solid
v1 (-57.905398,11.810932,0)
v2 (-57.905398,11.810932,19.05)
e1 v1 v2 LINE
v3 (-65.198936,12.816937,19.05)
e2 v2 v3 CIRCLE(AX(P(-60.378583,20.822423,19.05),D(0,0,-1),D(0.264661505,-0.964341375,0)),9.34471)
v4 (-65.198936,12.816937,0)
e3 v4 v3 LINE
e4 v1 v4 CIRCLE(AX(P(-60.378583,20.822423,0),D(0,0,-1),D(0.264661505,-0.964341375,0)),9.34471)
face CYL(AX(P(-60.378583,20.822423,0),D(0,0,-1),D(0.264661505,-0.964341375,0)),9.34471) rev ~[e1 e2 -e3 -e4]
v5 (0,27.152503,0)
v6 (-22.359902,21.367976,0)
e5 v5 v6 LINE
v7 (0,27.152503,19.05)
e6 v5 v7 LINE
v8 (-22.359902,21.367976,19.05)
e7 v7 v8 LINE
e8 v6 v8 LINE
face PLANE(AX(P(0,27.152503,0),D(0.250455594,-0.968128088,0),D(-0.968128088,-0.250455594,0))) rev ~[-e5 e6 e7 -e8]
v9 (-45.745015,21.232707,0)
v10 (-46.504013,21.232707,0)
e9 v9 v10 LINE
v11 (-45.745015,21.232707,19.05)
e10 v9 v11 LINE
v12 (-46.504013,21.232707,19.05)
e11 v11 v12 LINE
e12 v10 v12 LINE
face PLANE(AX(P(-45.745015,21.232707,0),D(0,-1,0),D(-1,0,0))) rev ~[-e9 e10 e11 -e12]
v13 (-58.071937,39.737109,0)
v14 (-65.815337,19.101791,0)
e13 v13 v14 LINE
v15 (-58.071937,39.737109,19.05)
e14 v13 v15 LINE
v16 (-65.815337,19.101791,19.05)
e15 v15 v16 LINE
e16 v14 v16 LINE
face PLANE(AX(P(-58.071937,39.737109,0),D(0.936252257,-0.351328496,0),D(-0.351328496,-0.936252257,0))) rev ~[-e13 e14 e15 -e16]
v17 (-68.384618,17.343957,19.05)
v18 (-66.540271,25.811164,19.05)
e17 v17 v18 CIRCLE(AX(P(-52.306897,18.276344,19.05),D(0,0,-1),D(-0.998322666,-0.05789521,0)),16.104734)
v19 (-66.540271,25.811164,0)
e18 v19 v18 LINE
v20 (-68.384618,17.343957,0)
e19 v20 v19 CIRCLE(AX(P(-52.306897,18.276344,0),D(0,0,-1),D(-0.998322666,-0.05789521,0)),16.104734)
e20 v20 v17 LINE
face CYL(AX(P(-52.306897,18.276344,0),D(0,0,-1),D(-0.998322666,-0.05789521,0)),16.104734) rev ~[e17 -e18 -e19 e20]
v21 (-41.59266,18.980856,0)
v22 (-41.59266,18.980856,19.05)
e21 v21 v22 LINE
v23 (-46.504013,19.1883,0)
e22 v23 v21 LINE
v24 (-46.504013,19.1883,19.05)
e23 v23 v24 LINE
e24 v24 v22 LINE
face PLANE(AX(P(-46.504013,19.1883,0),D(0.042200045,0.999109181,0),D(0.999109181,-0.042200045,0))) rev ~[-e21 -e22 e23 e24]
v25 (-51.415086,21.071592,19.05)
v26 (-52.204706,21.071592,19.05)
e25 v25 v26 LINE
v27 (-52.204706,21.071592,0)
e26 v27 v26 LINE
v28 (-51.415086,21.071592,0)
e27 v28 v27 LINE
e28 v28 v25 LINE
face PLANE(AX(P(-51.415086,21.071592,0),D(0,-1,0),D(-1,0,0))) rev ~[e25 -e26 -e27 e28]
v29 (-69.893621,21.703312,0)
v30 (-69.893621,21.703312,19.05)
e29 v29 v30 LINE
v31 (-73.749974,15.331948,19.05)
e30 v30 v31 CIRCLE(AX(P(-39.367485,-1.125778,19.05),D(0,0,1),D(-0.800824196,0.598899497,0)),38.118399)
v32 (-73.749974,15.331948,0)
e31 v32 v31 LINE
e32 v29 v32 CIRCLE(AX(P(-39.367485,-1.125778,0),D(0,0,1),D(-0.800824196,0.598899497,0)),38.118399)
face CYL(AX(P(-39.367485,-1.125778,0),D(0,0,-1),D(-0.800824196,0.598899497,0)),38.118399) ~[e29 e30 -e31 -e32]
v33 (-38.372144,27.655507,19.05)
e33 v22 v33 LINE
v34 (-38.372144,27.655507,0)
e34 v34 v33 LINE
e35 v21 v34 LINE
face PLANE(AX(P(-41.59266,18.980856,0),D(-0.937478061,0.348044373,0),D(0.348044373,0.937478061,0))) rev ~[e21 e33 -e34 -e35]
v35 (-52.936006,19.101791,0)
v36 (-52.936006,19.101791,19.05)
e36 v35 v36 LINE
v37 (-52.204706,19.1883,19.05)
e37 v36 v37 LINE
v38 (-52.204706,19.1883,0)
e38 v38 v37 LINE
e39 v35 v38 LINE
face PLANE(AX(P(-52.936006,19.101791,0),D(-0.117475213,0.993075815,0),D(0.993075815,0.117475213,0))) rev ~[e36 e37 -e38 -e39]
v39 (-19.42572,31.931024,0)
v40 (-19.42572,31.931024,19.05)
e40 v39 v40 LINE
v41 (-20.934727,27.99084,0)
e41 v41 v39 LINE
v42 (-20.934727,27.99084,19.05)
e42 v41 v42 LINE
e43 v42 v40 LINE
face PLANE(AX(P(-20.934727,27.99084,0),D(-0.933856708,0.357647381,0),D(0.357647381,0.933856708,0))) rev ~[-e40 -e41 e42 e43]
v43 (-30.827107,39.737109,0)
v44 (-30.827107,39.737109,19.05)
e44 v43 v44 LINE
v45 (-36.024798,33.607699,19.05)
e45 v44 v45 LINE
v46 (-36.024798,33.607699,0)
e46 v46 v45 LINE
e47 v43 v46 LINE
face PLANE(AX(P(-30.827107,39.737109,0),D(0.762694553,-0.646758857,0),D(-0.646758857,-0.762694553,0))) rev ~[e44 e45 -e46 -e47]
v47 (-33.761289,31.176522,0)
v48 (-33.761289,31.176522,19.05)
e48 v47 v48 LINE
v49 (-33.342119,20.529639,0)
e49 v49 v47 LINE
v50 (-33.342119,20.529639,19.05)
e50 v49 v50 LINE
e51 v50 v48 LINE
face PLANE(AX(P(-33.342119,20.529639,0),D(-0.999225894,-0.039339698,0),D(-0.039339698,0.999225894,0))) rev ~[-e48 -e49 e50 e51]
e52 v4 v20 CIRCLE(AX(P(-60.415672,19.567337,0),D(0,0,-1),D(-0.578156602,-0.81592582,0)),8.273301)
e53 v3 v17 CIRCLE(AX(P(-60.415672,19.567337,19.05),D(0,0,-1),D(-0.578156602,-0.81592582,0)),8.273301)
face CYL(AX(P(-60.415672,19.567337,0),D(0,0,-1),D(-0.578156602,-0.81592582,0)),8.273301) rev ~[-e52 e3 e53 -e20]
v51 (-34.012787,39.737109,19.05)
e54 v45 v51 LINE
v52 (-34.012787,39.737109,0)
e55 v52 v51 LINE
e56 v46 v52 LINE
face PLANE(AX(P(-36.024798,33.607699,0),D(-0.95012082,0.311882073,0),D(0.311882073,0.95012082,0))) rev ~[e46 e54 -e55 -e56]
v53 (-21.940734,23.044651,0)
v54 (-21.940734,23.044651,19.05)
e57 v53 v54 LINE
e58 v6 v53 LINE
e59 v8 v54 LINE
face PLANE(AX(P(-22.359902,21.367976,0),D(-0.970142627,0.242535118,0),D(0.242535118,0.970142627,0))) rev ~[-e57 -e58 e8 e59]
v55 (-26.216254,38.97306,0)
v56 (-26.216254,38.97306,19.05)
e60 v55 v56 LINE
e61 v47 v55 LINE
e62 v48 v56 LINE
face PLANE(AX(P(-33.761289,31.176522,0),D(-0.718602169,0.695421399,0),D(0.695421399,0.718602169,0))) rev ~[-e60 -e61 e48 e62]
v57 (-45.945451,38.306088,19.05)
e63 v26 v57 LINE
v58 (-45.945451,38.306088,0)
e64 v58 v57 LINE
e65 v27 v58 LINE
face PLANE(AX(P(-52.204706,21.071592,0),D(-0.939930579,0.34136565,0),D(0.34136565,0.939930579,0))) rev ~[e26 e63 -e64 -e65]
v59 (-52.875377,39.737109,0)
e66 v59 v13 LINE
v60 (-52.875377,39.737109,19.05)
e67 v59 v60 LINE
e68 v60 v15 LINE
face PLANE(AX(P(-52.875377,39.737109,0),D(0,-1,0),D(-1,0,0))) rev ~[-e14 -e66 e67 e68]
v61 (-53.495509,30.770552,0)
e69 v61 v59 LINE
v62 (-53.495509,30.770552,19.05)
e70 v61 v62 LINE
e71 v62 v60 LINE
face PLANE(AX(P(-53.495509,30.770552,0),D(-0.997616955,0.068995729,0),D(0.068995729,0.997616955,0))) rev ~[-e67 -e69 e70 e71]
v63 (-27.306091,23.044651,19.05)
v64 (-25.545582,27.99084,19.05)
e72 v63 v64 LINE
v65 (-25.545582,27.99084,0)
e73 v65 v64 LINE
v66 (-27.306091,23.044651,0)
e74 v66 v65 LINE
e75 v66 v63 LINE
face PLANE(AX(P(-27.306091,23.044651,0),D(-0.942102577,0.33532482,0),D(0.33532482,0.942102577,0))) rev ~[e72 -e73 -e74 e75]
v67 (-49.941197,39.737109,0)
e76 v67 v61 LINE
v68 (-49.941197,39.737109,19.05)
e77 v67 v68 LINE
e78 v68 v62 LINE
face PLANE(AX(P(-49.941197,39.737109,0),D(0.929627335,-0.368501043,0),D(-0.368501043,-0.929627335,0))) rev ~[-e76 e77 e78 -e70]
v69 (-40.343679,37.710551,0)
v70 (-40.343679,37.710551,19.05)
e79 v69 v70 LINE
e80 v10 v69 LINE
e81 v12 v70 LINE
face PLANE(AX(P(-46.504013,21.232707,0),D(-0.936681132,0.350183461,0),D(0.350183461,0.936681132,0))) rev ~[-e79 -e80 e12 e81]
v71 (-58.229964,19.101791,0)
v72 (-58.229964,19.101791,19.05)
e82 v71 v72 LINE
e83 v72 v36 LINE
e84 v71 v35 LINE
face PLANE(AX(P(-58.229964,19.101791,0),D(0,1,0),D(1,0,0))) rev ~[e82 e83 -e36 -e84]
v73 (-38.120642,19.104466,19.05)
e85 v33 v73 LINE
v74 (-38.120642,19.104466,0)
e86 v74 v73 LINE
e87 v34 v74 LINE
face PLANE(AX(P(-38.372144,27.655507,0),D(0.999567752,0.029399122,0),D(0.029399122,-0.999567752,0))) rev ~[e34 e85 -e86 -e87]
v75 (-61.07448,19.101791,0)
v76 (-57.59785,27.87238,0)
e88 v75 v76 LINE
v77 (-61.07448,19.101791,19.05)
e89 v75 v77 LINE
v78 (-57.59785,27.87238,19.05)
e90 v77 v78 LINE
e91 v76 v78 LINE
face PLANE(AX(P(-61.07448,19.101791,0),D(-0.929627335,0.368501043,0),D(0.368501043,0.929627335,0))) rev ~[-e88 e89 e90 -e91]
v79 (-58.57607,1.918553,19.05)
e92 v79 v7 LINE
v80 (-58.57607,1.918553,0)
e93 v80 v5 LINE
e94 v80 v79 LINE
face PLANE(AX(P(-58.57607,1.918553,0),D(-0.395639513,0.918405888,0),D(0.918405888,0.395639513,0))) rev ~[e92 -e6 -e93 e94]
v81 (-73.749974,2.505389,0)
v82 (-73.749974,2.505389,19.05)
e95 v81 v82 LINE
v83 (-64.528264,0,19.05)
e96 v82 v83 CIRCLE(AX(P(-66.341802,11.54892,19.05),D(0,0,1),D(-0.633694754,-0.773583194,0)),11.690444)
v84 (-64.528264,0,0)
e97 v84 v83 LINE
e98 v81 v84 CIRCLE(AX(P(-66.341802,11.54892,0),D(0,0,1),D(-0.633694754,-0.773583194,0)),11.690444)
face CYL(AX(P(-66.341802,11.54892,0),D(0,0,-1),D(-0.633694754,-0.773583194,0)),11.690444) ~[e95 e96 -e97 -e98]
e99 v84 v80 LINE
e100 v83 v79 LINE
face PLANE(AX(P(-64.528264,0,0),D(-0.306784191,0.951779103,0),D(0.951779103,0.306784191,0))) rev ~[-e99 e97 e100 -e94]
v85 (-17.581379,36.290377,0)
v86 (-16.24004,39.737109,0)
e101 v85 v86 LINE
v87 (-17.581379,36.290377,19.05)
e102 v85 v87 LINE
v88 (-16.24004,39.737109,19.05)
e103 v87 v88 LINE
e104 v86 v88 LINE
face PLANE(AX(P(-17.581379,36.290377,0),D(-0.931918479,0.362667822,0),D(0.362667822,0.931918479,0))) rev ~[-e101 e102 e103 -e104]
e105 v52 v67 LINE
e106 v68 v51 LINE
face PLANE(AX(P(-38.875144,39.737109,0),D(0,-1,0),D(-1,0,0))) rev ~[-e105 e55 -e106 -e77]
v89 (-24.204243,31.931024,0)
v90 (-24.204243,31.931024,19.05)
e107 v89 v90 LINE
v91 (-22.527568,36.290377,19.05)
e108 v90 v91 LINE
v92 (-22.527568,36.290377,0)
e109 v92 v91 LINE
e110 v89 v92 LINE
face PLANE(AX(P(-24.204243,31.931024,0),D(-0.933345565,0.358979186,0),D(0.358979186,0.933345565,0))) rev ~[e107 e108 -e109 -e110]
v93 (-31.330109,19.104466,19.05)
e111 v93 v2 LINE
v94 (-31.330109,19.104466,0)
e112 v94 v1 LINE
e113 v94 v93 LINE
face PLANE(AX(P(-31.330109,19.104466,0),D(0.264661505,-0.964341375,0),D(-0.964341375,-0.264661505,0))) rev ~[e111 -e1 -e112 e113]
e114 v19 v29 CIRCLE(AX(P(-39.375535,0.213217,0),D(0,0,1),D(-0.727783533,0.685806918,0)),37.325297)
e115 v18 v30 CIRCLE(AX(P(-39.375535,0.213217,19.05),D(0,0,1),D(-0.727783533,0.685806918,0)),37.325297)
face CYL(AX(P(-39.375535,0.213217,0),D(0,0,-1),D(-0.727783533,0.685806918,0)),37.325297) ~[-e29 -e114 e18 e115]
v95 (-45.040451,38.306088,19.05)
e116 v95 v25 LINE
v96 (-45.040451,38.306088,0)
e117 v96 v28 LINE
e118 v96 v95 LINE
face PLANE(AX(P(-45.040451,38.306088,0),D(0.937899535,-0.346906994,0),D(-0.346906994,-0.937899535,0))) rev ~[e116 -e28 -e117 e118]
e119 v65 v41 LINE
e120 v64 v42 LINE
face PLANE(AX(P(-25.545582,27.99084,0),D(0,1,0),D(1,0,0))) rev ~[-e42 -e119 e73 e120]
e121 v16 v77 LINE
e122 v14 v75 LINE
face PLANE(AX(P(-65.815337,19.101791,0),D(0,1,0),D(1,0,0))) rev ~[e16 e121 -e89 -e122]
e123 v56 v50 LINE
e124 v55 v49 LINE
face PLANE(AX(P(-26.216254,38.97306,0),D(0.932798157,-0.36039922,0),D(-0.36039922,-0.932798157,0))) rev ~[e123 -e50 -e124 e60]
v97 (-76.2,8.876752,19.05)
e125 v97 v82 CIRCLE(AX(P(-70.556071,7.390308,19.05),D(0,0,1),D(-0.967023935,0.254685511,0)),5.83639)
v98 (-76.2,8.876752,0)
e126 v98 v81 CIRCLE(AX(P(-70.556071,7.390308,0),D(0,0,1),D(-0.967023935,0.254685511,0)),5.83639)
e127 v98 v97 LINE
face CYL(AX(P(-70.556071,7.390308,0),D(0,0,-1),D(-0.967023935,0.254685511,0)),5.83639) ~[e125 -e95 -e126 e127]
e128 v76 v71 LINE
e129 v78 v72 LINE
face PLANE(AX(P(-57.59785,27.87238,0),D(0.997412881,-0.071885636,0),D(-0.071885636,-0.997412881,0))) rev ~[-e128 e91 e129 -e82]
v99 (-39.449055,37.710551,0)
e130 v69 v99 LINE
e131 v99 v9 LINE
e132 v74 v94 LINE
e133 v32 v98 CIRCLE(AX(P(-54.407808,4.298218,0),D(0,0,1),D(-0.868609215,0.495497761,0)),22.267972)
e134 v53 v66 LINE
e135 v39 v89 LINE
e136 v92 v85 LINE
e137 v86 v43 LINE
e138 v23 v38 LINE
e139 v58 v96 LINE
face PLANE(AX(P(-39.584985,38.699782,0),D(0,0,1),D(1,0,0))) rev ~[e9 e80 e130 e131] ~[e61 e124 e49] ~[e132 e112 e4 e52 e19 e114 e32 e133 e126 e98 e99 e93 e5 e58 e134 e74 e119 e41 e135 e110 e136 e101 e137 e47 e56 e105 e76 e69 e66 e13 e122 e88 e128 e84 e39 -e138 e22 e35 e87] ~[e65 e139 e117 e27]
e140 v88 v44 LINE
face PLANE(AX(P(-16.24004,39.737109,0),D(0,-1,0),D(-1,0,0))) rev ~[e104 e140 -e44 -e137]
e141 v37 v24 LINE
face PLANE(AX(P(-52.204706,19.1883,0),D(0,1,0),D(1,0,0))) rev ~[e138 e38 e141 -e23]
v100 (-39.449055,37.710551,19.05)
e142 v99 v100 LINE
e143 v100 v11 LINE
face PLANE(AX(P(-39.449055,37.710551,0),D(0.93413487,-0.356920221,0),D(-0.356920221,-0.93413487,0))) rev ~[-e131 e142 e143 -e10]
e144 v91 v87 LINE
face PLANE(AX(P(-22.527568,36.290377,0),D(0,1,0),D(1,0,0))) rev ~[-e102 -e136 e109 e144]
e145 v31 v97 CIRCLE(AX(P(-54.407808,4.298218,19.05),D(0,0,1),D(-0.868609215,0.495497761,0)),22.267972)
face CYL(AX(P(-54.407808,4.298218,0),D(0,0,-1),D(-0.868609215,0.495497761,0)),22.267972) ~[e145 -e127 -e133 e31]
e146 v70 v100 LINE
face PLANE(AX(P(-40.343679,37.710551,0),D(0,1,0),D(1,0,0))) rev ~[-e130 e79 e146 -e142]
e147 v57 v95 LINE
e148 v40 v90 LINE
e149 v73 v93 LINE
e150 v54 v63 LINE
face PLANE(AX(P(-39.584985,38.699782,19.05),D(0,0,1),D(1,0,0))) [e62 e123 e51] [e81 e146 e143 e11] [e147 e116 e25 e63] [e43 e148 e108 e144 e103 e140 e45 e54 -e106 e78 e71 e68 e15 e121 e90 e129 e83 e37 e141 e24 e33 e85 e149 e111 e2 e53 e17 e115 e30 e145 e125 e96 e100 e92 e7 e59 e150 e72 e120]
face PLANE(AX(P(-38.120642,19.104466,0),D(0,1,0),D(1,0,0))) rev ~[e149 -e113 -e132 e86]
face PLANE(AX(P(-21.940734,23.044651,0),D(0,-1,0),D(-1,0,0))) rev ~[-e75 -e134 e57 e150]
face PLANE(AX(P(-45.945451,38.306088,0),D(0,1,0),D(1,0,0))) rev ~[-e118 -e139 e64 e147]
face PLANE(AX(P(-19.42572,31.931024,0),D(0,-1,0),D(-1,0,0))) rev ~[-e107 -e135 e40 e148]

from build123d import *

# Parameters (mm, degrees)
F1_DEPTH = 19.05
F3_DEPTH = 19.05


# Not quite as in the source:
# - a feature names something its author has since deleted; it is built from what else it names


with BuildPart() as f1:
    # F0 (on Top) → F1 (new body)
    with BuildSketch(Plane.XY):
        Polygon((-39.6296493709, 39.737109375), (-44.4920025766, 39.737109375), (-45.0404509902, 38.3060877886), (-51.4150857925, 21.0715923085), (-52.2047057748, 19.1882997751), (-47.2585186362, 19.1882997751), (-46.5040132403, 21.2327073224), (-40.3436794877, 37.7105511725), align=None)
    extrude(amount=F1_DEPTH)



with BuildPart() as f1b:
    # F0 (on Top) → F1, piece 2 (new body)
    with BuildSketch(Plane.XY):
        Polygon((-52.8753772378, 39.737109375), (-58.071937412, 39.737109375), (-65.8153370023, 19.1017910838), (-61.0744804144, 19.1017910838), (-57.5978495181, 27.8723798692), (-58.2299642265, 19.1017910838), (-52.9360063374, 19.1017910838), (-52.2047057748, 21.0715923085), (-45.9454512168, 38.3060877886), (-45.4141758382, 39.737109375), (-49.9411970377, 39.737109375), (-53.4955092069, 30.7705519863), align=None)
    extrude(amount=F1_DEPTH)


with BuildPart() as f1c:
    # F0 (on Top) → F1, piece 3 (new body)
    with BuildSketch(Plane.XY):
        with BuildLine():
            Line((-34.012787044, 39.737109375), (-38.875143975, 39.737109375))
            Line((-38.875143975, 39.737109375), (-39.4490547478, 37.7105511725))
            Line((-39.4490547478, 37.7105511725), (-45.7450146313, 21.2327073224))
            Line((-45.7450146313, 21.2327073224), (-46.5040132403, 19.1882997751))
            Line((-46.5040132403, 19.1882997751), (-41.5926604458, 18.9808556717))
            Line((-41.5926604458, 18.9808556717), (-38.3721441031, 27.6555065066))
            Line((-38.3721441031, 27.6555065066), (-38.1206423044, 19.1044658422))
            Line((-38.1206423044, 19.1044658422), (-31.3301086426, 19.1044658422))
            Line((-31.3301086426, 19.1044658422), (-57.9053983092, 11.8109323084))
            ThreePointArc((-57.9053983092, 11.8109323084), (-61.6554191389, 11.565355508), (-65.1989355683, 12.816936709))
            ThreePointArc((-65.1989355683, 12.816936709), (-67.1816299808, 14.8061054603), (-68.3846175671, 17.3439569771))
            ThreePointArc((-68.3846175671, 17.3439569771), (-68.0426528163, 21.7039427005), (-66.5402710438, 25.8111637086))
            ThreePointArc((-66.5402710438, 25.8111637086), (-68.289988101, 23.8168641952), (-69.8936209083, 21.7033121735))
            ThreePointArc((-69.8936209083, 21.7033121735), (-71.9777744598, 18.6120372362), (-73.74997437, 15.331948176))
            ThreePointArc((-73.74997437, 15.331948176), (-75.226699634, 12.199885885), (-76.2, 8.8767521083))
            ThreePointArc((-76.2, 8.8767521083), (-76.0035829361, 5.2955374253), (-73.74997437, 2.505389275))
            ThreePointArc((-73.74997437, 2.505389275), (-69.4068023904, 0.267420013), (-64.5282641053, 0))
            Line((-64.5282641053, 0), (-58.5760697722, 1.9185534911))
            Line((-58.5760697722, 1.9185534911), (0, 27.1525029093))
            Line((0, 27.1525029093), (-22.3599020392, 21.367976442))
            Line((-22.3599020392, 21.367976442), (-21.9407342374, 23.0446513742))
            Line((-21.9407342374, 23.0446513742), (-27.3060910404, 23.0446513742))
            Line((-27.3060910404, 23.0446513742), (-25.5455821753, 27.9908403754))
            Line((-25.5455821753, 27.9908403754), (-20.9347270429, 27.9908403754))
            Line((-20.9347270429, 27.9908403754), (-19.4257199764, 31.9310240448))
            Line((-19.4257199764, 31.9310240448), (-24.2042429745, 31.9310240448))
            Line((-24.2042429745, 31.9310240448), (-22.5275680423, 36.2903773785))
            Line((-22.5275680423, 36.2903773785), (-17.5813790411, 36.2903773785))
            Line((-17.5813790411, 36.2903773785), (-16.2400398403, 39.737109375))
            Line((-16.2400398403, 39.737109375), (-30.827106908, 39.737109375))
            Line((-30.827106908, 39.737109375), (-36.0247977078, 33.607698977))
            Line((-36.0247977078, 33.607698977), (-34.012787044, 39.737109375))
        make_face()
        Polygon((-26.2162536383, 38.9730595052), (-33.3421193063, 20.5296389759), (-33.7612889707, 31.1765223742), align=None, mode=Mode.SUBTRACT)
    extrude(amount=F1_DEPTH)


with BuildPart() as f1_1:
    add(f1.part)

    add(f1b.part)  # F3 merges F1b

    add(f1c.part)  # F3 merges F1c
    # F2 (on Top) → F3 (join, through all)
    with BuildSketch(Plane.XY):
        Polygon((-39.4490547478, 37.7105511725), (-38.875143975, 39.737109375), (-39.6296493709, 39.737109375), (-40.3436794877, 37.7105511725), align=None)
        Polygon((-46.5040132403, 19.1882997751), (-45.7450146313, 21.2327073224), (-46.5040132403, 21.2327073224), (-47.2585186362, 19.1882997751), align=None)
        Polygon((-52.2047057748, 19.1882997751), (-51.4150857925, 21.0715923085), (-52.2047057748, 21.0715923085), (-52.9360063374, 19.1017910838), align=None)
        Polygon((-45.0404509902, 38.3060877886), (-44.4920025766, 39.737109375), (-45.4141758382, 39.737109375), (-45.9454512168, 38.3060877886), align=None)
    extrude(amount=F3_DEPTH)


solid = f1_1.part
